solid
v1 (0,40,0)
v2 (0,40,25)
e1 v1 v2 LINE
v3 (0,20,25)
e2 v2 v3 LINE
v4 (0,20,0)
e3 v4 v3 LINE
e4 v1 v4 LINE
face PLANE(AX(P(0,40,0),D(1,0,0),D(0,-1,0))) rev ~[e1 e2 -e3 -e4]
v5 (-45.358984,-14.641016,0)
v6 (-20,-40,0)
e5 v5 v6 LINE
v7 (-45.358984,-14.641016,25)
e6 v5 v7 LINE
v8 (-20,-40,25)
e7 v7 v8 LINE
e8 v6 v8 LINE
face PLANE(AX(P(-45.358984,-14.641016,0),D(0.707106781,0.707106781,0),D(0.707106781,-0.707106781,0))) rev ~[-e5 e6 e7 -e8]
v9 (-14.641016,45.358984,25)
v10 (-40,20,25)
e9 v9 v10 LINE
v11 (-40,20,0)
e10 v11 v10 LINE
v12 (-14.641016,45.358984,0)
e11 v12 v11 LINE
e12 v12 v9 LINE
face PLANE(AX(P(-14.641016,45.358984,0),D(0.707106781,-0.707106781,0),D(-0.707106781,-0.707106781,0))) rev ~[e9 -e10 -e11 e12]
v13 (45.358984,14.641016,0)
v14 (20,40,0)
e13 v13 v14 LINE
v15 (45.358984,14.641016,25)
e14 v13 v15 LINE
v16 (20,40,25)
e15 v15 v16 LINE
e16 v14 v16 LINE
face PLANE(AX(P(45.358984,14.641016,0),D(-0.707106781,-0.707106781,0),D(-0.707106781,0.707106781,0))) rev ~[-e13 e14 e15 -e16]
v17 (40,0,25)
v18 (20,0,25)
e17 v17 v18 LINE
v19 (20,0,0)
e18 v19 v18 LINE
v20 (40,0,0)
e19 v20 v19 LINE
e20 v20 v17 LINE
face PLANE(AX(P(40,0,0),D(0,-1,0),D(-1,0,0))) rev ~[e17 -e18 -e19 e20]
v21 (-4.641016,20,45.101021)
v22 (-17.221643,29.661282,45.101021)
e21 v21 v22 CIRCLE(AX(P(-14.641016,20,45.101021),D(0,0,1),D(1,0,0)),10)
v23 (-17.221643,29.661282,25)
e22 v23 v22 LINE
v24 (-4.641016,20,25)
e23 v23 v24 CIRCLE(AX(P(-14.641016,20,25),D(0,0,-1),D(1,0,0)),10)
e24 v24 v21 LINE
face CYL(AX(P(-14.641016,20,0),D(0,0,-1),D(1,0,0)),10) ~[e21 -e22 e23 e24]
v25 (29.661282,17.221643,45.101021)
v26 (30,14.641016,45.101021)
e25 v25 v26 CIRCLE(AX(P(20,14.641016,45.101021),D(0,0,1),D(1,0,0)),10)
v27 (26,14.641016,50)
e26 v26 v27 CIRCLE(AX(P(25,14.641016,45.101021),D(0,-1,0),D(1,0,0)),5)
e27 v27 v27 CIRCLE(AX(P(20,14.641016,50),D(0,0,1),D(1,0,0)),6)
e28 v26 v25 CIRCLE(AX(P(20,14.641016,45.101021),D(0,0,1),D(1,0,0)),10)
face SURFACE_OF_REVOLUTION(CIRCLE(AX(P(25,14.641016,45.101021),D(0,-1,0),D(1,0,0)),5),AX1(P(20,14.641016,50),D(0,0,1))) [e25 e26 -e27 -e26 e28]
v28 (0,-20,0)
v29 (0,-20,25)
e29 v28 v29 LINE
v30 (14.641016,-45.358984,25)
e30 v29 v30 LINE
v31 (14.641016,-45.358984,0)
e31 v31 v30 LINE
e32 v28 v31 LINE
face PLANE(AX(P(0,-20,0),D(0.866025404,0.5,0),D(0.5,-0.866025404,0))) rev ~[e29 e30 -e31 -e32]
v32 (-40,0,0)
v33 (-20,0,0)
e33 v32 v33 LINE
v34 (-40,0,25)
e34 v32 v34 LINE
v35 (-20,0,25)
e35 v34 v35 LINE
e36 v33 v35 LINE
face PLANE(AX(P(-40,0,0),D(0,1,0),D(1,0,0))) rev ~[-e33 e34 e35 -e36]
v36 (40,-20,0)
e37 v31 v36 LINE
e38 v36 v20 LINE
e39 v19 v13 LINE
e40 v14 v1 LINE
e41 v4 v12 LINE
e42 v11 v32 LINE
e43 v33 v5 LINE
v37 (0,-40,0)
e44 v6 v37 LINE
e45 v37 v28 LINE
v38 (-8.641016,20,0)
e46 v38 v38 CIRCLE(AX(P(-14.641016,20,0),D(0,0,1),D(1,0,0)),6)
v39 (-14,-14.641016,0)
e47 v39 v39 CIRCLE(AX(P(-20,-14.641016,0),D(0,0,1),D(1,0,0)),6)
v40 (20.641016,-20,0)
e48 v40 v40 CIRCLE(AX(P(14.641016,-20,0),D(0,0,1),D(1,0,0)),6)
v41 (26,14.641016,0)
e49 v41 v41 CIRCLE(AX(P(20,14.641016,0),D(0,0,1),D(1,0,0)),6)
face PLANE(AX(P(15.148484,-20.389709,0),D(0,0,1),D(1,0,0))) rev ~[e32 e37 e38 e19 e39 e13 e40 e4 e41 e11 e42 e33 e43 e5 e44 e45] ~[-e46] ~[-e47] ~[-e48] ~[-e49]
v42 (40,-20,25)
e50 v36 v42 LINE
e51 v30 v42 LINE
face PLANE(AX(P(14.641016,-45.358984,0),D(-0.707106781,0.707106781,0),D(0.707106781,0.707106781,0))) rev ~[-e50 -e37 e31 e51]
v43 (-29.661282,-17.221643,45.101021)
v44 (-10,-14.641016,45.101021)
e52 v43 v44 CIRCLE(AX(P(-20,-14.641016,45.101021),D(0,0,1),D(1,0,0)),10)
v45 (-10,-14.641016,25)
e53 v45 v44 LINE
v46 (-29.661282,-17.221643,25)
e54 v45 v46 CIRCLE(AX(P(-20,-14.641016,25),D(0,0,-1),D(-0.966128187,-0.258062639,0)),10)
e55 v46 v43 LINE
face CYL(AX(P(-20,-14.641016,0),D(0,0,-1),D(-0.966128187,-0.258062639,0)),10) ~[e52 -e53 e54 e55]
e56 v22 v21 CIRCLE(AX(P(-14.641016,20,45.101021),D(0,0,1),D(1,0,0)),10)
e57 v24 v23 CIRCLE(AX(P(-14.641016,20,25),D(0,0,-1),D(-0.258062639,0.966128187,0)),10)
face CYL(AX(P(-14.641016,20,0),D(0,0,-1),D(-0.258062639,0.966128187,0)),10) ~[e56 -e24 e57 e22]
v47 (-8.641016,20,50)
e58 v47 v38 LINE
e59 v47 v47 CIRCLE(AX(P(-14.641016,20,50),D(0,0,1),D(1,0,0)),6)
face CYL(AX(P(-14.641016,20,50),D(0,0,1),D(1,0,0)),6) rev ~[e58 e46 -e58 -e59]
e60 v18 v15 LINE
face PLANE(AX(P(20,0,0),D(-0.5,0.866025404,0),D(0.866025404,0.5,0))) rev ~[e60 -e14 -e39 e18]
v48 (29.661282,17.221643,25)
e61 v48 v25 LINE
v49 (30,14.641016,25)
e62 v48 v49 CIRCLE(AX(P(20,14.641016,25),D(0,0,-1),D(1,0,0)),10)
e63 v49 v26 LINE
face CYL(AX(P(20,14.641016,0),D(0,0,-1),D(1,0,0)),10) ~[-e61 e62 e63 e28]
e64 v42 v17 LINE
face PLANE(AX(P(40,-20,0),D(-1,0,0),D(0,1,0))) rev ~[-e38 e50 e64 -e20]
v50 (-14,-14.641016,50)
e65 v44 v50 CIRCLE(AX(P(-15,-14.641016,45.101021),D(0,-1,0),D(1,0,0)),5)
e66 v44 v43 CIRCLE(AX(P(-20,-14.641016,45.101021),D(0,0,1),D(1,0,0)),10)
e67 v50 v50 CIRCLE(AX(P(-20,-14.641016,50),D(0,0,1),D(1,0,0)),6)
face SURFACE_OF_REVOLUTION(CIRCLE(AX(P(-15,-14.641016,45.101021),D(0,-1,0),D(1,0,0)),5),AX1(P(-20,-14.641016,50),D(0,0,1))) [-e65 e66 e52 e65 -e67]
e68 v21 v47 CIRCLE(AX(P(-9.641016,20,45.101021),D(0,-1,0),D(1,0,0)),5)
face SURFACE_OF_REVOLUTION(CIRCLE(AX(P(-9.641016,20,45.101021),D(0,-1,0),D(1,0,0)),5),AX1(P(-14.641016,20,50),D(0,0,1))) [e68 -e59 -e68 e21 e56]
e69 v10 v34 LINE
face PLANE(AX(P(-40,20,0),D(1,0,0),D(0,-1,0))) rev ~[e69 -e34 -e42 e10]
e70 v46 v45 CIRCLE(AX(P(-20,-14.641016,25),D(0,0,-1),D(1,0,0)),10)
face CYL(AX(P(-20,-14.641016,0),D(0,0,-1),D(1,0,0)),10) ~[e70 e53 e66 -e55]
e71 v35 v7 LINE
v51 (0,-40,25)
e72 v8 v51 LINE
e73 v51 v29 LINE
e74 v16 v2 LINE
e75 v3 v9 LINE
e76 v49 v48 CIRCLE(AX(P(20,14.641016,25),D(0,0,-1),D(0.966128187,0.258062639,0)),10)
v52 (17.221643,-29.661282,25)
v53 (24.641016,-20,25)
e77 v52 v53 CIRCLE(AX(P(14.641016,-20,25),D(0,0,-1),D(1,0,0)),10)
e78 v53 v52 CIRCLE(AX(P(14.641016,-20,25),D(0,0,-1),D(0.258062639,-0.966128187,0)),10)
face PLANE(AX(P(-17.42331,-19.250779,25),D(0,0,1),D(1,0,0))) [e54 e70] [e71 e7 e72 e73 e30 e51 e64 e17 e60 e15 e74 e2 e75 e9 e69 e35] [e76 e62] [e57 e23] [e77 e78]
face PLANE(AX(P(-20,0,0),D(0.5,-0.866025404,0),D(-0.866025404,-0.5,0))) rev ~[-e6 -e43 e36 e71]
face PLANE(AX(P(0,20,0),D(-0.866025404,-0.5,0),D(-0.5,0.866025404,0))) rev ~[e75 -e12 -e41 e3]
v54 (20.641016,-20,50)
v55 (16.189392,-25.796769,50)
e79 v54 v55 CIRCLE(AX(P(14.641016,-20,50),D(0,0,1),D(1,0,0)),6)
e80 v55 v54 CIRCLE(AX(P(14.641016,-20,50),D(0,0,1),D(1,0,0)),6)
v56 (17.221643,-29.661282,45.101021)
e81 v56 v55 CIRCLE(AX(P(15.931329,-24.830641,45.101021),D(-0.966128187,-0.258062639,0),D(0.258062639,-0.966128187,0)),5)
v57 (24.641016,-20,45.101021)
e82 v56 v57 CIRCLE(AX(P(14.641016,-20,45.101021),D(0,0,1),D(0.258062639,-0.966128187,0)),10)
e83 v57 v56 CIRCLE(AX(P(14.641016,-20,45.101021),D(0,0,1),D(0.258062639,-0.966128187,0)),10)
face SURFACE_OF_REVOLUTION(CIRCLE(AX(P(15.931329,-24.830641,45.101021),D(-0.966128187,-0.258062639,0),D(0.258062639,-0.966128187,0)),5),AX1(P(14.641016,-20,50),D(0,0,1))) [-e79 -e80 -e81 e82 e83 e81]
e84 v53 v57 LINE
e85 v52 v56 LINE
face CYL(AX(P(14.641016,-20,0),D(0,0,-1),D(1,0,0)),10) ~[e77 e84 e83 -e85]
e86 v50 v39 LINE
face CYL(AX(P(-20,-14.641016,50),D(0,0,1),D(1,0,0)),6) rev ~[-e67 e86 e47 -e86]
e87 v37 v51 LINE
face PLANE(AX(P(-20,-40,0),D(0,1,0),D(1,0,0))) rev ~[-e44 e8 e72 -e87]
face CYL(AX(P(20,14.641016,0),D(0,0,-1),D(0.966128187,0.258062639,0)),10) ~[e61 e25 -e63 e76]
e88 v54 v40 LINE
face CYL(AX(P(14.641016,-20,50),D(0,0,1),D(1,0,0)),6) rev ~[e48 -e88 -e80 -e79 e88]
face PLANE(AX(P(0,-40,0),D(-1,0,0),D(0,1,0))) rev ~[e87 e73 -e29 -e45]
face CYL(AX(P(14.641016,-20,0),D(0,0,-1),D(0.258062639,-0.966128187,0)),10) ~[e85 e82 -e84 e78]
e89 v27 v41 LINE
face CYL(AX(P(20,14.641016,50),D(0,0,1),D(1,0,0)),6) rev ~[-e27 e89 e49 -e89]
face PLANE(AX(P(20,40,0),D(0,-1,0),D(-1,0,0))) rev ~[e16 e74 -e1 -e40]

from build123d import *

# Parameters (mm, degrees)
F1_DEPTH = 25
F2_DEPTH = 50
F3_R     = 6
F4_DEPTH = 50
F5_DEPTH = 50


# Not quite as in the source:
# - a fillet or chamfer that OpenCascade refuses, or shapes differently, is made with other operations: its cross-section is extruded or revolved along the edge and cut away or added


with BuildPart() as f1:
    # F0 (on Top) → F1 (new body)
    with BuildSketch(Plane.XY):
        Polygon((0, -20), (0, 0), (-20, 0), (-45.3589838486, -14.6410161514), (-20, -40), (0, -40), align=None)
        with BuildLine():
            ThreePointArc((-10, -14.6410161514), (-18.6986197214, -24.5559750202), (-29.6612818741, -17.2216425383))
            ThreePointArc((-29.6612818741, -17.2216425383), (-21.3013802786, -4.7260572825), (-10, -14.6410161514))
        make_face(mode=Mode.SUBTRACT)
        Polygon((-20, 0), (0, 0), (0, 20), (-14.6410161514, 45.3589838486), (-40, 20), (-40, 0), align=None)
        with BuildLine():
            ThreePointArc((-4.6410161514, 20), (-20.7317359828, 12.0688505288), (-17.2216425383, 29.6612818741))
            ThreePointArc((-17.2216425383, 29.6612818741), (-8.5502963199, 27.9311494712), (-4.6410161514, 20))
        make_face(mode=Mode.SUBTRACT)
        Polygon((0, 20), (0, 0), (20, 0), (45.3589838486, 14.6410161514), (20, 40), (0, 40), align=None)
        with BuildLine():
            ThreePointArc((30, 14.6410161514), (10.0850411312, 13.3396358728), (29.6612818741, 17.2216425383))
            ThreePointArc((29.6612818741, 17.2216425383), (29.9149588688, 15.9423964299), (30, 14.6410161514))
        make_face(mode=Mode.SUBTRACT)
        Polygon((20, 0), (0, 0), (0, -20), (14.6410161514, -45.3589838486), (40, -20), (40, 0), align=None)
        with BuildLine():
            ThreePointArc((24.6410161514, -20), (22.5721656226, -26.0907198315), (17.2216425383, -29.6612818741))
            ThreePointArc((17.2216425383, -29.6612818741), (6.7098666802, -13.9092801685), (24.6410161514, -20))
        make_face(mode=Mode.SUBTRACT)
        with BuildLine():
            ThreePointArc((-10, -14.6410161514), (-21.3013802786, -4.7260572825), (-29.6612818741, -17.2216425383))
            ThreePointArc((-29.6612818741, -17.2216425383), (-18.6986197214, -24.5559750202), (-10, -14.6410161514))
        make_face()
        with BuildLine():
            ThreePointArc((-4.6410161514, 20), (-8.5502963199, 27.9311494712), (-17.2216425383, 29.6612818741))
            ThreePointArc((-17.2216425383, 29.6612818741), (-20.7317359828, 12.0688505288), (-4.6410161514, 20))
        make_face()
        with BuildLine():
            ThreePointArc((30, 14.6410161514), (29.9149588688, 15.9423964299), (29.6612818741, 17.2216425383))
            ThreePointArc((29.6612818741, 17.2216425383), (10.0850411312, 13.3396358728), (30, 14.6410161514))
        make_face()
        with BuildLine():
            ThreePointArc((24.6410161514, -20), (6.7098666802, -13.9092801685), (17.2216425383, -29.6612818741))
            ThreePointArc((17.2216425383, -29.6612818741), (22.5721656226, -26.0907198315), (24.6410161514, -20))
        make_face()
    extrude(amount=F1_DEPTH)

    # F0 (on Top) → F2 (join)
    with BuildSketch(Plane.XY):
        with BuildLine():
            ThreePointArc((24.6410161514, -20), (6.7098666802, -13.9092801685), (17.2216425383, -29.6612818741))
            ThreePointArc((17.2216425383, -29.6612818741), (22.5721656226, -26.0907198315), (24.6410161514, -20))
        make_face()
        with BuildLine():
            ThreePointArc((-10, -14.6410161514), (-21.3013802786, -4.7260572825), (-29.6612818741, -17.2216425383))
            ThreePointArc((-29.6612818741, -17.2216425383), (-18.6986197214, -24.5559750202), (-10, -14.6410161514))
        make_face()
        with BuildLine():
            ThreePointArc((-4.6410161514, 20), (-8.5502963199, 27.9311494712), (-17.2216425383, 29.6612818741))
            ThreePointArc((-17.2216425383, 29.6612818741), (-20.7317359828, 12.0688505288), (-4.6410161514, 20))
        make_face()
        with BuildLine():
            ThreePointArc((30, 14.6410161514), (29.9149588688, 15.9423964299), (29.6612818741, 17.2216425383))
            ThreePointArc((29.6612818741, 17.2216425383), (10.0850411312, 13.3396358728), (30, 14.6410161514))
        make_face()
    extrude(amount=F2_DEPTH)

    # F3 (on face) → F4 (cut)
    with BuildSketch(Plane.XY.offset(50)):
        with Locations((-14.6410161514, 20)):
            Circle(F3_R)
    extrude(amount=-F4_DEPTH, mode=Mode.SUBTRACT)

    # F3 (on face) → F5 (cut)
    with BuildSketch(Plane.XY.offset(50)):
        with Locations((20, 14.6410161514)):
            Circle(F3_R)
        with Locations((14.6410161514, -20)):
            Circle(F3_R)
        with Locations((-20, -14.6410161514)):
            Circle(F3_R)
        with Locations((-14.6410161514, 20)):
            Circle(F3_R)
    extrude(amount=-F5_DEPTH, mode=Mode.SUBTRACT)

    # F6: fillet of radius 5 on 4 edges, made by hand

    # F6_s1 → F6_t2 (revolve, cut)
    with BuildSketch(Plane.XZ.offset(14.6410161514)):
        with BuildLine():
            ThreePointArc((-10, 45.1010205144), (-11.1270166538, 48.2632981746), (-14, 50))
            Line((-14, 50), (-10, 50))
            Line((-10, 50), (-10, 45.1010205144))
        make_face()
    revolve(axis=Axis((-20, -14.6410161514, 50), (0, 0, 1)), mode=Mode.SUBTRACT)

    # F6_s3 → F6_t4 (revolve, cut)
    with BuildSketch(Plane.XZ.offset(-20)):
        with BuildLine():
            ThreePointArc((-4.6410161514, 45.1010205144), (-5.7680328052, 48.2632981746), (-8.6410161514, 50))
            Line((-8.6410161514, 50), (-4.6410161514, 50))
            Line((-4.6410161514, 50), (-4.6410161514, 45.1010205144))
        make_face()
    revolve(axis=Axis((-14.6410161514, 20, 50), (0, 0, 1)), mode=Mode.SUBTRACT)

    # F6_s5 → F6_t6 (revolve, cut)
    with BuildSketch(Plane(origin=(8.6795464871, 2.3183949069, 0), x_dir=(0, 0, 1), z_dir=(-0.9661281874, -0.2580626387, 0))):
        with BuildLine():
            ThreePointArc((45.1010205144, -33.1008630094), (48.2632981746, -31.9738463556), (50, -29.1008630094))
            Line((50, -29.1008630094), (50, -33.1008630094))
            Line((50, -33.1008630094), (45.1010205144, -33.1008630094))
        make_face()
    revolve(axis=Axis((14.6410161514, -20, 50), (0, 0, 1)), mode=Mode.SUBTRACT)

    # F6_s7 → F6_t8 (revolve, cut)
    with BuildSketch(Plane.XZ.offset(-14.6410161514)):
        with BuildLine():
            ThreePointArc((30, 45.1010205144), (28.8729833462, 48.2632981746), (26, 50))
            Line((26, 50), (30, 50))
            Line((30, 50), (30, 45.1010205144))
        make_face()
    revolve(axis=Axis((20, 14.6410161514, 50), (0, 0, 1)), mode=Mode.SUBTRACT)


solid = f1.part
